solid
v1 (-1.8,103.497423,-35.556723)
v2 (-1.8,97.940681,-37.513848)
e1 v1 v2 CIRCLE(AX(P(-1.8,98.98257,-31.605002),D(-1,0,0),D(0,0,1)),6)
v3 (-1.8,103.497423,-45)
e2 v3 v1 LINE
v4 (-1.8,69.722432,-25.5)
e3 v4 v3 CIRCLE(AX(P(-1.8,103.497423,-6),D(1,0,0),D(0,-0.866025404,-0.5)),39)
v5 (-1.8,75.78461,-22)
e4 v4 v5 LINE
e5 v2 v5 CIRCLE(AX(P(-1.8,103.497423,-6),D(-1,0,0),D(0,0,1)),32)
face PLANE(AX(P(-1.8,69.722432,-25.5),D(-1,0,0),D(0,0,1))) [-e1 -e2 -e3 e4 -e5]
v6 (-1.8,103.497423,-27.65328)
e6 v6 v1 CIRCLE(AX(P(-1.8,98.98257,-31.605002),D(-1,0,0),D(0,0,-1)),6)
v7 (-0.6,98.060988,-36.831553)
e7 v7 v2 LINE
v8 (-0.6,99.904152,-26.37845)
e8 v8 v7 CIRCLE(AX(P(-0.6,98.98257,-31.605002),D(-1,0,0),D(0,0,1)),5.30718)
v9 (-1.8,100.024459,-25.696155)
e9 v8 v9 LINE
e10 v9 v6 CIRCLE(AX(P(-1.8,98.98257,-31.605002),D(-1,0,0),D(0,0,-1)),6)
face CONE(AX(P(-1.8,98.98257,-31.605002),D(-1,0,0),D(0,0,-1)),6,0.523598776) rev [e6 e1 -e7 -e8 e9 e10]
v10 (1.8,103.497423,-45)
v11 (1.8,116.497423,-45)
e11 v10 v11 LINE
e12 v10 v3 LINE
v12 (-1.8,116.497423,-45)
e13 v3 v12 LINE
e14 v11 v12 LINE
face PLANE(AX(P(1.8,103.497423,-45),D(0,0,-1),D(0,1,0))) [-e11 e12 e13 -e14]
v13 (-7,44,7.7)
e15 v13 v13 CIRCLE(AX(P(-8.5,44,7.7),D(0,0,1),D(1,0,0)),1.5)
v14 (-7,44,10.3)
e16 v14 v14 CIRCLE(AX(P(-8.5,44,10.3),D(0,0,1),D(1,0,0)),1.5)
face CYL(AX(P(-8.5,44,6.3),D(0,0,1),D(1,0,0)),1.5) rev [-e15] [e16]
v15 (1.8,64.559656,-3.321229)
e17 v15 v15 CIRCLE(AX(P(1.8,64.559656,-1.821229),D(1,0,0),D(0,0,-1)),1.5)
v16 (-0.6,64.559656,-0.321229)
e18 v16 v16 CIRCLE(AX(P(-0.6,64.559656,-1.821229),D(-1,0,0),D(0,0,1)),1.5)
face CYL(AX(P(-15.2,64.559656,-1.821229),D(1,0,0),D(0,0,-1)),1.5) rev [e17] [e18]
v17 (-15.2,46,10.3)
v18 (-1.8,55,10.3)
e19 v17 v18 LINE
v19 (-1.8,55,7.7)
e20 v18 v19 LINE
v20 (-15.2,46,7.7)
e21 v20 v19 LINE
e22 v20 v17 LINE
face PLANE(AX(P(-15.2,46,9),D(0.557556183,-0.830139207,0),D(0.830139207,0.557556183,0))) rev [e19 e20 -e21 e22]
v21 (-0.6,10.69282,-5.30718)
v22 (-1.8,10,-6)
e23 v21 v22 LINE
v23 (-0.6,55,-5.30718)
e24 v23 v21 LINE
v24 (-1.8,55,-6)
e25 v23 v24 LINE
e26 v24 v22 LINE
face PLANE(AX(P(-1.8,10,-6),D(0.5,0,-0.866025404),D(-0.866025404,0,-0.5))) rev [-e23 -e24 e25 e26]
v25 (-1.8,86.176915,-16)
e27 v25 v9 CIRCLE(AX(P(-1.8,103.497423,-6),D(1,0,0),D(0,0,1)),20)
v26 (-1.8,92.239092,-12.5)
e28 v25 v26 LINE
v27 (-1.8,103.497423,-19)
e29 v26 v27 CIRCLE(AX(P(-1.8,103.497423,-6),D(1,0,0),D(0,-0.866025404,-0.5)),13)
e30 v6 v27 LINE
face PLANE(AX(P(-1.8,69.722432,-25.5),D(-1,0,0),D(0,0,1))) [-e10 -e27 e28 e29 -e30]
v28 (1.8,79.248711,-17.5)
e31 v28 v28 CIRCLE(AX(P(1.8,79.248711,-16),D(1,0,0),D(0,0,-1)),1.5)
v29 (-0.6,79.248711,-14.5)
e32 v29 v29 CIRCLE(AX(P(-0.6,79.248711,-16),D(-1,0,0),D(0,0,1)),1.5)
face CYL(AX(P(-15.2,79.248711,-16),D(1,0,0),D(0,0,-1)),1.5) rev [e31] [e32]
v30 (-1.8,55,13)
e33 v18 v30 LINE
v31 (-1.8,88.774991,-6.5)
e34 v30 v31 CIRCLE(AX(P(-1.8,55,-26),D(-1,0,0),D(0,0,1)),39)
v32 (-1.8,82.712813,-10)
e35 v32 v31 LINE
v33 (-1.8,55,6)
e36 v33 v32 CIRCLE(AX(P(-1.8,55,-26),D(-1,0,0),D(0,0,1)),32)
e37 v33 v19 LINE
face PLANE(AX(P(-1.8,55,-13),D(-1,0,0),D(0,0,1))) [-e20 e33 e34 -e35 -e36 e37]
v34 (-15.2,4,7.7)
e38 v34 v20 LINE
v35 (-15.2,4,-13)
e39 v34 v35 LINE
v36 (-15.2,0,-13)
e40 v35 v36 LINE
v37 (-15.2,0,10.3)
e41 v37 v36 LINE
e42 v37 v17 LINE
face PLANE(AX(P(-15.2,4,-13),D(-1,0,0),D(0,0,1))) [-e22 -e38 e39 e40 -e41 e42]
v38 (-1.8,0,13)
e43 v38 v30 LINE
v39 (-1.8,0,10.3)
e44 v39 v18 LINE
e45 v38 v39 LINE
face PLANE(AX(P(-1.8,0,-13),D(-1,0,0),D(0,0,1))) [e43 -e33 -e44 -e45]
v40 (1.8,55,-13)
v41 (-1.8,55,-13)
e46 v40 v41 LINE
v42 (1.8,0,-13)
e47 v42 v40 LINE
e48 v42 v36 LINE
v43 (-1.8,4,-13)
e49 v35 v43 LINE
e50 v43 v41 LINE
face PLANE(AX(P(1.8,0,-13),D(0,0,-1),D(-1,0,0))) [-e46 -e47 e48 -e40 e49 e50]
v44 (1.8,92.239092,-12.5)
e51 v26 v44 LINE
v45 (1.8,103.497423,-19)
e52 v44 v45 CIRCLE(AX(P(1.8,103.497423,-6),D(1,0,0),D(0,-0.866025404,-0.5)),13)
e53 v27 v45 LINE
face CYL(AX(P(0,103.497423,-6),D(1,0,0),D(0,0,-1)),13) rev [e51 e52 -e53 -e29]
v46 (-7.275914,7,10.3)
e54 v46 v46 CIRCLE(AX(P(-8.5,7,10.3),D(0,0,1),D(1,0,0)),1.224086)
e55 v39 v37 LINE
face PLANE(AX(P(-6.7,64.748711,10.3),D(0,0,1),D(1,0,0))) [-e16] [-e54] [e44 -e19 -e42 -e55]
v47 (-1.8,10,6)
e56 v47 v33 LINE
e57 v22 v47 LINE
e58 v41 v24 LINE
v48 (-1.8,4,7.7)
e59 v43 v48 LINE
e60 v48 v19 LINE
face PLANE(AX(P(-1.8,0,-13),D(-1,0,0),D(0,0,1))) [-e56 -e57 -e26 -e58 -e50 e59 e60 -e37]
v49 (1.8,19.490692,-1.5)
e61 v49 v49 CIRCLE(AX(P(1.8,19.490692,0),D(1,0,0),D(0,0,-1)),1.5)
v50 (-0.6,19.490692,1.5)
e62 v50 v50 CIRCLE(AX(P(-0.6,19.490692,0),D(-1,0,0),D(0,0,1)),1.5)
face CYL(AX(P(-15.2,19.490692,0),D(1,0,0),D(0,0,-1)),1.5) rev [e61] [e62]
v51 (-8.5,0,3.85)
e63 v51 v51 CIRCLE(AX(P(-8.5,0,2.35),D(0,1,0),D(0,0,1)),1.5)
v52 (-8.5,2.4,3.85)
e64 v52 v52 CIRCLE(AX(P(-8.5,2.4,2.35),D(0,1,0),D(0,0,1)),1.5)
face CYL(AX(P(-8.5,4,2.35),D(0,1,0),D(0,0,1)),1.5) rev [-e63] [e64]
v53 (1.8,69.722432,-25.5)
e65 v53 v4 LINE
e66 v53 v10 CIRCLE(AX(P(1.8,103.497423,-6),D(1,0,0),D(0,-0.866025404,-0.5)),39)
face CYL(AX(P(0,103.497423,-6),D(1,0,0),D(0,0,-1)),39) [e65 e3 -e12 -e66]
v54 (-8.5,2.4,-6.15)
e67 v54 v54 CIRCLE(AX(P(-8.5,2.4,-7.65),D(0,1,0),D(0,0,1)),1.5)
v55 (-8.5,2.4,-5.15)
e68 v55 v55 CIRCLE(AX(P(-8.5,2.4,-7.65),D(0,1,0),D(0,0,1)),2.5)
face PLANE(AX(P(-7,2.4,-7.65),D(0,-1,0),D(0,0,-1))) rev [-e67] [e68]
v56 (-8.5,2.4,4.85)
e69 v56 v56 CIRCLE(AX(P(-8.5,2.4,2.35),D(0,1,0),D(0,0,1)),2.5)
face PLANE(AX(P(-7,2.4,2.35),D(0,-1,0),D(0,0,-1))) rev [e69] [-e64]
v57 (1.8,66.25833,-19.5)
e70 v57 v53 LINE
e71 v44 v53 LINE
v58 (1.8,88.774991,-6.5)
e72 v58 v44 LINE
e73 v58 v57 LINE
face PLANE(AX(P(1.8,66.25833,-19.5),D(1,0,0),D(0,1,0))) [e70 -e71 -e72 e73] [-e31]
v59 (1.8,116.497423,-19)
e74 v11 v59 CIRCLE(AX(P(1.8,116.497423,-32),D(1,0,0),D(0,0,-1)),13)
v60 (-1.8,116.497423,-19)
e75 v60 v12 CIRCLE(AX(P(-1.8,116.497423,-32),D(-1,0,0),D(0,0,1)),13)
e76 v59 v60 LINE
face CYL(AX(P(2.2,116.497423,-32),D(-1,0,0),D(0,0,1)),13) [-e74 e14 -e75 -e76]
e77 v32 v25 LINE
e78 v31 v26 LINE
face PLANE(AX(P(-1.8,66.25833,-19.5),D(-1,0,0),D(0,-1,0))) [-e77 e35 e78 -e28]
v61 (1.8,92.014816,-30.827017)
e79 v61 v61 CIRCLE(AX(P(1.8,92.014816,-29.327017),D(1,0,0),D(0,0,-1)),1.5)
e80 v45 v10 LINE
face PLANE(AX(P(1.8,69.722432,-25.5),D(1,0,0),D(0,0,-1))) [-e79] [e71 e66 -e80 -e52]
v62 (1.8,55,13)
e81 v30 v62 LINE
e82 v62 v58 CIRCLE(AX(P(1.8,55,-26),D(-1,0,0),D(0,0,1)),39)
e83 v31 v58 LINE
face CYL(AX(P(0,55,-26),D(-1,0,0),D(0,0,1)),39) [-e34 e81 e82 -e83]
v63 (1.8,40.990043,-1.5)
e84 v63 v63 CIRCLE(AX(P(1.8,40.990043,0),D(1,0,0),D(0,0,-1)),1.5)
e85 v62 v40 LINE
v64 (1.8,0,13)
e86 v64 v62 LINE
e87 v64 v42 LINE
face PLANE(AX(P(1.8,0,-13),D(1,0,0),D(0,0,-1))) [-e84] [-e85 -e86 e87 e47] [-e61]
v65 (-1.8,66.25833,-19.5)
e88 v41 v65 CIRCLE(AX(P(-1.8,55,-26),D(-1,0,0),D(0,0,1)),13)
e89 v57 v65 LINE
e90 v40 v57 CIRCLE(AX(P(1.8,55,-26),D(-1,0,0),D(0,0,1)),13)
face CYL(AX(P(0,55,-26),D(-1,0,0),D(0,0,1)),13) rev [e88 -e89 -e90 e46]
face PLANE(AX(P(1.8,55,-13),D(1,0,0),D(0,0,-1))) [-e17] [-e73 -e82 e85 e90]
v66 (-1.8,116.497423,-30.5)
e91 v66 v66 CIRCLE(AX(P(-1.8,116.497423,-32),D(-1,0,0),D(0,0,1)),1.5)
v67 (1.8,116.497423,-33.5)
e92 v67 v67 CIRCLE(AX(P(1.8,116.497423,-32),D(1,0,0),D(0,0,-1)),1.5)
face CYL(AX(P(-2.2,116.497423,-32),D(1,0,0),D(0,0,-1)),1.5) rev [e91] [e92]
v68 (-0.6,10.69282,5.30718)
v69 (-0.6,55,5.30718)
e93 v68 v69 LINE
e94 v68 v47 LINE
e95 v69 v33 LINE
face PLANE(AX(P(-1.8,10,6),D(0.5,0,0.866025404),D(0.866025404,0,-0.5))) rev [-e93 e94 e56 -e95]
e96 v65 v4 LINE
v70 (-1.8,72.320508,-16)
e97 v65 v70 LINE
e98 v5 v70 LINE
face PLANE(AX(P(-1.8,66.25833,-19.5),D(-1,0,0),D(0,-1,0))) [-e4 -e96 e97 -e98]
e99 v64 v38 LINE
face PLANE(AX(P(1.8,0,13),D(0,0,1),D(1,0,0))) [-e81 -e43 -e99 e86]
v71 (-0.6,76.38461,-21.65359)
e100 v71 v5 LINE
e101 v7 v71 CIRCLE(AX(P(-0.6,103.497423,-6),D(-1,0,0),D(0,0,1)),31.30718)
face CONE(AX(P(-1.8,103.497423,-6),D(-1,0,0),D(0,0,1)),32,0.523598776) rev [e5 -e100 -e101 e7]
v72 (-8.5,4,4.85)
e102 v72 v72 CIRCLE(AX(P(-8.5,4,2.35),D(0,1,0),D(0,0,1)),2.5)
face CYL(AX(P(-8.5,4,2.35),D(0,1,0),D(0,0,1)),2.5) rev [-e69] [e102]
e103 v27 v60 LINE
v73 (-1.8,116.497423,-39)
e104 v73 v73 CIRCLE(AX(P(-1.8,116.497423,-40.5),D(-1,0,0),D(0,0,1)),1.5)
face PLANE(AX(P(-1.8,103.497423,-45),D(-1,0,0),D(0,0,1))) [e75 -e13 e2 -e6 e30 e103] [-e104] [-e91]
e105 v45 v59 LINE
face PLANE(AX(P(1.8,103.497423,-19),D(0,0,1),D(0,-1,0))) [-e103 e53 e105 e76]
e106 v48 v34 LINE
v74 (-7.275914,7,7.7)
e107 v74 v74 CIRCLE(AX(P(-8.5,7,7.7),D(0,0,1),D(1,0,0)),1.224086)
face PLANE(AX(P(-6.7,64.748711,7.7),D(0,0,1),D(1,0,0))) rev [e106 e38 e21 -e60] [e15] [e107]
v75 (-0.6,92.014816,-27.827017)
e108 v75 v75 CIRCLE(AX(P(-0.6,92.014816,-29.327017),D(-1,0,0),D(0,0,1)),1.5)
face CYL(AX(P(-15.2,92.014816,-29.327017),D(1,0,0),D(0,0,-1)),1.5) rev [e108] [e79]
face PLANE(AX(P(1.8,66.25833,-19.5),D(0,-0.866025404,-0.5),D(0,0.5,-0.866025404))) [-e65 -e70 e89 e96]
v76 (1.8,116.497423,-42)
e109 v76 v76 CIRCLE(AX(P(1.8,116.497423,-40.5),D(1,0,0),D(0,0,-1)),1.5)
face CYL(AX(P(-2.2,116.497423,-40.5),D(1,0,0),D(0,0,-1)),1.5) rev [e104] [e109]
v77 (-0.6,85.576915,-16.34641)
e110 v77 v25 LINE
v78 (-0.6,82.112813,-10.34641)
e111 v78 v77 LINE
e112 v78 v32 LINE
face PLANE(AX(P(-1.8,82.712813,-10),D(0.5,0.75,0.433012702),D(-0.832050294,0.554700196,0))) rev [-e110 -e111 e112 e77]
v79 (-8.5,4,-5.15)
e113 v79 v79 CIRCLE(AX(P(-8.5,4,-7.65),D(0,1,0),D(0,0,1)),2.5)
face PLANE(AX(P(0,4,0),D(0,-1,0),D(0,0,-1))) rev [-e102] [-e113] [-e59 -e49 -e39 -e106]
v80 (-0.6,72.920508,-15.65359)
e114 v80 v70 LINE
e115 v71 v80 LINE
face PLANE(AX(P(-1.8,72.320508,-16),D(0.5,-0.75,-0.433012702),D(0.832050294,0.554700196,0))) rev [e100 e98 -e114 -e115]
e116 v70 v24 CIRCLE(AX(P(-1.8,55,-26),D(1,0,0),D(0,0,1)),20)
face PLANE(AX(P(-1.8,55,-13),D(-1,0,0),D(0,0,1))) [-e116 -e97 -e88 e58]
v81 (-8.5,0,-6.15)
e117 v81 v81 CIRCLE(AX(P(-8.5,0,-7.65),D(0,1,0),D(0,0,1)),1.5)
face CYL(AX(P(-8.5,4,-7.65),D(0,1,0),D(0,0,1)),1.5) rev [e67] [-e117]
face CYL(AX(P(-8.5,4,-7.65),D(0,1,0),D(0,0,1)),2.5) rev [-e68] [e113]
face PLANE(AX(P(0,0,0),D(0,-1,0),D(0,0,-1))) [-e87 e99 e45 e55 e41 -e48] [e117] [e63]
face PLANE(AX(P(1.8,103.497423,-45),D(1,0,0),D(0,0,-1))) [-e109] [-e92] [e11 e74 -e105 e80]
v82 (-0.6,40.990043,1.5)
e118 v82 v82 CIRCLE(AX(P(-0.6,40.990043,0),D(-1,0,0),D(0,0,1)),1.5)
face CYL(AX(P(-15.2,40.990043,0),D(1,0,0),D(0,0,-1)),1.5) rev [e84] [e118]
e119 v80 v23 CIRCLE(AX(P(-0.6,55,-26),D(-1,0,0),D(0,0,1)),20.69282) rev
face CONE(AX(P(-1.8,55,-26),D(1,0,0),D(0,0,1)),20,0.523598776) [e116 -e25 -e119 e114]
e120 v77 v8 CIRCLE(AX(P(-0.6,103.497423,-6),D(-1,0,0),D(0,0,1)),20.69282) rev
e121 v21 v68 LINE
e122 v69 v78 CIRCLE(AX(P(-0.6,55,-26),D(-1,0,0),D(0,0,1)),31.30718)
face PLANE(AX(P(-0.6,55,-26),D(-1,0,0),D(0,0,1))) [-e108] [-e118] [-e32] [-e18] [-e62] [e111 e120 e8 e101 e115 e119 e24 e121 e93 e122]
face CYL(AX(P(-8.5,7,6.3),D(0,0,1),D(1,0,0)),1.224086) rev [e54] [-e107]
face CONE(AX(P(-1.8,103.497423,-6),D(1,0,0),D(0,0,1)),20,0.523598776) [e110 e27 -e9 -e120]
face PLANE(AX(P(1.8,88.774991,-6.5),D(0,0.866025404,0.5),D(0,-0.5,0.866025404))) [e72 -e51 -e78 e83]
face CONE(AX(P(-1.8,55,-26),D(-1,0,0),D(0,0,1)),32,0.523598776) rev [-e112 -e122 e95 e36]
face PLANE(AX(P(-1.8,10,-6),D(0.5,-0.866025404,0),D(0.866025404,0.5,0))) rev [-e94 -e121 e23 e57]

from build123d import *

# Parameters (mm, degrees)
SKETCH_2_W                = 3.6
SKETCH_2_H                = 26
SKETCH_3_W                = 17
SKETCH_3_H                = 33
EXTRUDE_1_DEPTH           = 4
RIB_START                 = -1.3
RIB_1_DEPTH               = 2.6
SKETCH_5_R                = 1.5
SKETCH_5_R_2              = 1.224086187
CUT_EXTRUDE_1_DEPTH       = 4
CUT_EXTRUDE_2_DEPTH       = 4
SKETCH_7_R                = 1.5
CUT_EXTRUDE_3_DEPTH       = 4
CUT_EXTRUDE_4_DEPTH       = 1.2
CUT_EXTRUDE_4_DRAFT       = -30
HOLE_WIZARD_1_D           = 3
HOLE_WIZARD_1_CBORE_D     = 5
HOLE_WIZARD_1_CBORE_DEPTH = 1.6
CUT_EXTRUDE_6_DEPTH       = 135.185107528
SKETCH_25_R               = 1.5
CUT_EXTRUDE_8_DEPTH       = 139.143340278


# Read off the part's stored shape, not the designer's step: 筋1
with BuildPart() as part:
    # 扫描1: sweep along a path in 草图1
    with BuildLine(Plane(origin=(0, 0, 0), x_dir=(0, 0, -1), z_dir=(1, 0, 0))) as sweep_1_path:
        Line((0, 0), (0, 55))
        ThreePointArc((0, 55), (3.483339502, 68), (13, 77.516660498))
        Line((13, 77.516660498), (19, 80.980762114))
        ThreePointArc((19, 80.980762114), (28.516660498, 90.497422612), (32, 103.497422612))
        Line((32, 103.497422612), (32, 129.497422612))
    # 草图2 → 扫描1 (sweep)
    with BuildSketch(Plane(origin=(0, 0, 0), x_dir=(1, 0, 0), z_dir=(0, 1, 0))):
        Rectangle(SKETCH_2_W, SKETCH_2_H)
    sweep(path=sweep_1_path.line)

    # 草图3 → 凸台-拉伸1 (add)
    with BuildSketch(Plane.XZ):
        with Locations((-6.7, 3.5)):
            Rectangle(SKETCH_3_W, SKETCH_3_H)
    extrude(amount=-EXTRUDE_1_DEPTH)

    # 筋1 outline → 筋1 (add)
    with BuildSketch(Plane.XY.offset(9).offset(RIB_START)):
        Polygon((-1.8, 55), (-15.2, 46), (-15.2, 4), (-1.8, 4), align=None)
    extrude(amount=RIB_1_DEPTH)

    # 草图5 → 切除-拉伸1 (cut)
    with BuildSketch(Plane.XY.offset(10.3)):
        with Locations((-8.5, 44)):
            Circle(SKETCH_5_R)
        with Locations((-8.5, 7)):
            Circle(SKETCH_5_R_2)
    extrude(amount=-CUT_EXTRUDE_1_DEPTH, mode=Mode.SUBTRACT)

    # 草图6 → 切除-拉伸2 (cut)
    with BuildSketch(Plane.ZY.offset(1.8)):
        with BuildLine():
            Line((-45, 129.497422612), (-45, 116.497422612))
            ThreePointArc((-45, 116.497422612), (-41.192388155, 125.689810767), (-32, 129.497422612))
            Line((-32, 129.497422612), (-45, 129.497422612))
        make_face()
        with BuildLine():
            ThreePointArc((-32, 129.497422612), (-22.807611845, 125.689810767), (-19, 116.497422612))
            Line((-19, 116.497422612), (-19, 129.497422612))
            Line((-19, 129.497422612), (-32, 129.497422612))
        make_face()
    extrude(amount=-CUT_EXTRUDE_2_DEPTH, mode=Mode.SUBTRACT)

    # 草图7 → 切除-拉伸3 (cut)
    with BuildSketch(Plane(origin=(1.8, 0, 0), x_dir=(0, 0, -1), z_dir=(1, 0, 0))):
        with Locations((32, 116.497422612)):
            Circle(SKETCH_7_R)
        with Locations((40.5, 116.497422612)):
            Circle(SKETCH_7_R)
    extrude(amount=-CUT_EXTRUDE_3_DEPTH, mode=Mode.SUBTRACT)


with BuildPart() as cut_extrude_4_tool:
    # 草图8 → 切除-拉伸4 (with draft: the straight prism first)
    with BuildSketch(Plane.ZY.offset(1.8)):
        with BuildLine():
            Line((6, 10), (6, 55))
            ThreePointArc((6, 55), (1.712812921, 71), (-10, 82.712812921))
            Line((-10, 82.712812921), (-16, 86.176914536))
            ThreePointArc((-16, 86.176914536), (-22.383040886, 92.025893885), (-25.69615506, 100.024459059))
            ThreePointArc((-25.69615506, 100.024459059), (-32.646890644, 104.891416511), (-37.513848096, 97.940680927))
            ThreePointArc((-37.513848096, 97.940680927), (-32.212865417, 85.142976649), (-22, 75.784609691))
            Line((-22, 75.784609691), (-16, 72.320508076))
            ThreePointArc((-16, 72.320508076), (-8.679491924, 65), (-6, 55))
            Line((-6, 55), (-6, 10))
            Line((-6, 10), (6, 10))
        make_face()
    extrude(amount=-CUT_EXTRUDE_4_DEPTH)
    # 切除-拉伸4: the draft: its side faces are tilted about the plane it starts from
    cut_extrude_4_sides = [cut_extrude_4_tool.faces().sort_by_distance(p)[0] for p in [
        (-1.2, 32.5, 6),
        (-1.2, 71, 1.712812921),
        (-1.2, 84.444863729, -13),
        (-1.2, 92.025893885, -22.383040886),
        (-1.2, 104.891416511, -32.646890644),
        (-1.2, 85.142976649, -32.212865417),
        (-1.2, 74.052558883, -19),
        (-1.2, 65, -8.679491924),
        (-1.2, 32.5, -6),
        (-1.2, 10, 0),
    ]]
    draft(cut_extrude_4_sides, Plane.ZY.offset(1.8), CUT_EXTRUDE_4_DRAFT)


with BuildPart() as part_1:
    add(part.part)

    # 切除-拉伸4: cut by cut_extrude_4_tool
    add(cut_extrude_4_tool.part, mode=Mode.SUBTRACT)

    # 孔1 (through all)
    with Locations(Plane(origin=(0, 4, 0), x_dir=(1, 0, 0), z_dir=(0, 1, 0))):
        with Locations((-8.5, 7.65), (-8.5, -2.35)):
            CounterBoreHole(HOLE_WIZARD_1_D / 2, HOLE_WIZARD_1_CBORE_D / 2, HOLE_WIZARD_1_CBORE_DEPTH)

    # 草图18 → 切除-拉伸6 (cut, through all)
    with BuildSketch(Plane(origin=(0, 4, 0), x_dir=(1, 0, 0), z_dir=(0, 1, 0))):
        Polygon((-1.8, -13), (-1.8, -10.3), (-15.2, -10.3), (-15.2, -20), (1.8, -20), (1.8, -13), align=None)
    extrude(amount=-CUT_EXTRUDE_6_DEPTH, mode=Mode.SUBTRACT)

    # 草图25 → 切除-拉伸8 (cut, through all)
    with BuildSketch(Plane(origin=(1.8, 0, 0), x_dir=(0, 0, -1), z_dir=(1, 0, 0))):
        with Locations((0, 19.490691587)):
            Circle(SKETCH_25_R)
    cut_extrude_8 = extrude(amount=-CUT_EXTRUDE_8_DEPTH, mode=Mode.SUBTRACT)

    # 草图阵列1: 切除-拉伸8 at 4 more places
    with Locations((0, 21.499351, 0), (0, 45.068964, -1.821229), (0, 72.524124, -29.327017), (0, 59.75802, -16)):
        add(cut_extrude_8, mode=Mode.SUBTRACT)


solid = part_1.part
